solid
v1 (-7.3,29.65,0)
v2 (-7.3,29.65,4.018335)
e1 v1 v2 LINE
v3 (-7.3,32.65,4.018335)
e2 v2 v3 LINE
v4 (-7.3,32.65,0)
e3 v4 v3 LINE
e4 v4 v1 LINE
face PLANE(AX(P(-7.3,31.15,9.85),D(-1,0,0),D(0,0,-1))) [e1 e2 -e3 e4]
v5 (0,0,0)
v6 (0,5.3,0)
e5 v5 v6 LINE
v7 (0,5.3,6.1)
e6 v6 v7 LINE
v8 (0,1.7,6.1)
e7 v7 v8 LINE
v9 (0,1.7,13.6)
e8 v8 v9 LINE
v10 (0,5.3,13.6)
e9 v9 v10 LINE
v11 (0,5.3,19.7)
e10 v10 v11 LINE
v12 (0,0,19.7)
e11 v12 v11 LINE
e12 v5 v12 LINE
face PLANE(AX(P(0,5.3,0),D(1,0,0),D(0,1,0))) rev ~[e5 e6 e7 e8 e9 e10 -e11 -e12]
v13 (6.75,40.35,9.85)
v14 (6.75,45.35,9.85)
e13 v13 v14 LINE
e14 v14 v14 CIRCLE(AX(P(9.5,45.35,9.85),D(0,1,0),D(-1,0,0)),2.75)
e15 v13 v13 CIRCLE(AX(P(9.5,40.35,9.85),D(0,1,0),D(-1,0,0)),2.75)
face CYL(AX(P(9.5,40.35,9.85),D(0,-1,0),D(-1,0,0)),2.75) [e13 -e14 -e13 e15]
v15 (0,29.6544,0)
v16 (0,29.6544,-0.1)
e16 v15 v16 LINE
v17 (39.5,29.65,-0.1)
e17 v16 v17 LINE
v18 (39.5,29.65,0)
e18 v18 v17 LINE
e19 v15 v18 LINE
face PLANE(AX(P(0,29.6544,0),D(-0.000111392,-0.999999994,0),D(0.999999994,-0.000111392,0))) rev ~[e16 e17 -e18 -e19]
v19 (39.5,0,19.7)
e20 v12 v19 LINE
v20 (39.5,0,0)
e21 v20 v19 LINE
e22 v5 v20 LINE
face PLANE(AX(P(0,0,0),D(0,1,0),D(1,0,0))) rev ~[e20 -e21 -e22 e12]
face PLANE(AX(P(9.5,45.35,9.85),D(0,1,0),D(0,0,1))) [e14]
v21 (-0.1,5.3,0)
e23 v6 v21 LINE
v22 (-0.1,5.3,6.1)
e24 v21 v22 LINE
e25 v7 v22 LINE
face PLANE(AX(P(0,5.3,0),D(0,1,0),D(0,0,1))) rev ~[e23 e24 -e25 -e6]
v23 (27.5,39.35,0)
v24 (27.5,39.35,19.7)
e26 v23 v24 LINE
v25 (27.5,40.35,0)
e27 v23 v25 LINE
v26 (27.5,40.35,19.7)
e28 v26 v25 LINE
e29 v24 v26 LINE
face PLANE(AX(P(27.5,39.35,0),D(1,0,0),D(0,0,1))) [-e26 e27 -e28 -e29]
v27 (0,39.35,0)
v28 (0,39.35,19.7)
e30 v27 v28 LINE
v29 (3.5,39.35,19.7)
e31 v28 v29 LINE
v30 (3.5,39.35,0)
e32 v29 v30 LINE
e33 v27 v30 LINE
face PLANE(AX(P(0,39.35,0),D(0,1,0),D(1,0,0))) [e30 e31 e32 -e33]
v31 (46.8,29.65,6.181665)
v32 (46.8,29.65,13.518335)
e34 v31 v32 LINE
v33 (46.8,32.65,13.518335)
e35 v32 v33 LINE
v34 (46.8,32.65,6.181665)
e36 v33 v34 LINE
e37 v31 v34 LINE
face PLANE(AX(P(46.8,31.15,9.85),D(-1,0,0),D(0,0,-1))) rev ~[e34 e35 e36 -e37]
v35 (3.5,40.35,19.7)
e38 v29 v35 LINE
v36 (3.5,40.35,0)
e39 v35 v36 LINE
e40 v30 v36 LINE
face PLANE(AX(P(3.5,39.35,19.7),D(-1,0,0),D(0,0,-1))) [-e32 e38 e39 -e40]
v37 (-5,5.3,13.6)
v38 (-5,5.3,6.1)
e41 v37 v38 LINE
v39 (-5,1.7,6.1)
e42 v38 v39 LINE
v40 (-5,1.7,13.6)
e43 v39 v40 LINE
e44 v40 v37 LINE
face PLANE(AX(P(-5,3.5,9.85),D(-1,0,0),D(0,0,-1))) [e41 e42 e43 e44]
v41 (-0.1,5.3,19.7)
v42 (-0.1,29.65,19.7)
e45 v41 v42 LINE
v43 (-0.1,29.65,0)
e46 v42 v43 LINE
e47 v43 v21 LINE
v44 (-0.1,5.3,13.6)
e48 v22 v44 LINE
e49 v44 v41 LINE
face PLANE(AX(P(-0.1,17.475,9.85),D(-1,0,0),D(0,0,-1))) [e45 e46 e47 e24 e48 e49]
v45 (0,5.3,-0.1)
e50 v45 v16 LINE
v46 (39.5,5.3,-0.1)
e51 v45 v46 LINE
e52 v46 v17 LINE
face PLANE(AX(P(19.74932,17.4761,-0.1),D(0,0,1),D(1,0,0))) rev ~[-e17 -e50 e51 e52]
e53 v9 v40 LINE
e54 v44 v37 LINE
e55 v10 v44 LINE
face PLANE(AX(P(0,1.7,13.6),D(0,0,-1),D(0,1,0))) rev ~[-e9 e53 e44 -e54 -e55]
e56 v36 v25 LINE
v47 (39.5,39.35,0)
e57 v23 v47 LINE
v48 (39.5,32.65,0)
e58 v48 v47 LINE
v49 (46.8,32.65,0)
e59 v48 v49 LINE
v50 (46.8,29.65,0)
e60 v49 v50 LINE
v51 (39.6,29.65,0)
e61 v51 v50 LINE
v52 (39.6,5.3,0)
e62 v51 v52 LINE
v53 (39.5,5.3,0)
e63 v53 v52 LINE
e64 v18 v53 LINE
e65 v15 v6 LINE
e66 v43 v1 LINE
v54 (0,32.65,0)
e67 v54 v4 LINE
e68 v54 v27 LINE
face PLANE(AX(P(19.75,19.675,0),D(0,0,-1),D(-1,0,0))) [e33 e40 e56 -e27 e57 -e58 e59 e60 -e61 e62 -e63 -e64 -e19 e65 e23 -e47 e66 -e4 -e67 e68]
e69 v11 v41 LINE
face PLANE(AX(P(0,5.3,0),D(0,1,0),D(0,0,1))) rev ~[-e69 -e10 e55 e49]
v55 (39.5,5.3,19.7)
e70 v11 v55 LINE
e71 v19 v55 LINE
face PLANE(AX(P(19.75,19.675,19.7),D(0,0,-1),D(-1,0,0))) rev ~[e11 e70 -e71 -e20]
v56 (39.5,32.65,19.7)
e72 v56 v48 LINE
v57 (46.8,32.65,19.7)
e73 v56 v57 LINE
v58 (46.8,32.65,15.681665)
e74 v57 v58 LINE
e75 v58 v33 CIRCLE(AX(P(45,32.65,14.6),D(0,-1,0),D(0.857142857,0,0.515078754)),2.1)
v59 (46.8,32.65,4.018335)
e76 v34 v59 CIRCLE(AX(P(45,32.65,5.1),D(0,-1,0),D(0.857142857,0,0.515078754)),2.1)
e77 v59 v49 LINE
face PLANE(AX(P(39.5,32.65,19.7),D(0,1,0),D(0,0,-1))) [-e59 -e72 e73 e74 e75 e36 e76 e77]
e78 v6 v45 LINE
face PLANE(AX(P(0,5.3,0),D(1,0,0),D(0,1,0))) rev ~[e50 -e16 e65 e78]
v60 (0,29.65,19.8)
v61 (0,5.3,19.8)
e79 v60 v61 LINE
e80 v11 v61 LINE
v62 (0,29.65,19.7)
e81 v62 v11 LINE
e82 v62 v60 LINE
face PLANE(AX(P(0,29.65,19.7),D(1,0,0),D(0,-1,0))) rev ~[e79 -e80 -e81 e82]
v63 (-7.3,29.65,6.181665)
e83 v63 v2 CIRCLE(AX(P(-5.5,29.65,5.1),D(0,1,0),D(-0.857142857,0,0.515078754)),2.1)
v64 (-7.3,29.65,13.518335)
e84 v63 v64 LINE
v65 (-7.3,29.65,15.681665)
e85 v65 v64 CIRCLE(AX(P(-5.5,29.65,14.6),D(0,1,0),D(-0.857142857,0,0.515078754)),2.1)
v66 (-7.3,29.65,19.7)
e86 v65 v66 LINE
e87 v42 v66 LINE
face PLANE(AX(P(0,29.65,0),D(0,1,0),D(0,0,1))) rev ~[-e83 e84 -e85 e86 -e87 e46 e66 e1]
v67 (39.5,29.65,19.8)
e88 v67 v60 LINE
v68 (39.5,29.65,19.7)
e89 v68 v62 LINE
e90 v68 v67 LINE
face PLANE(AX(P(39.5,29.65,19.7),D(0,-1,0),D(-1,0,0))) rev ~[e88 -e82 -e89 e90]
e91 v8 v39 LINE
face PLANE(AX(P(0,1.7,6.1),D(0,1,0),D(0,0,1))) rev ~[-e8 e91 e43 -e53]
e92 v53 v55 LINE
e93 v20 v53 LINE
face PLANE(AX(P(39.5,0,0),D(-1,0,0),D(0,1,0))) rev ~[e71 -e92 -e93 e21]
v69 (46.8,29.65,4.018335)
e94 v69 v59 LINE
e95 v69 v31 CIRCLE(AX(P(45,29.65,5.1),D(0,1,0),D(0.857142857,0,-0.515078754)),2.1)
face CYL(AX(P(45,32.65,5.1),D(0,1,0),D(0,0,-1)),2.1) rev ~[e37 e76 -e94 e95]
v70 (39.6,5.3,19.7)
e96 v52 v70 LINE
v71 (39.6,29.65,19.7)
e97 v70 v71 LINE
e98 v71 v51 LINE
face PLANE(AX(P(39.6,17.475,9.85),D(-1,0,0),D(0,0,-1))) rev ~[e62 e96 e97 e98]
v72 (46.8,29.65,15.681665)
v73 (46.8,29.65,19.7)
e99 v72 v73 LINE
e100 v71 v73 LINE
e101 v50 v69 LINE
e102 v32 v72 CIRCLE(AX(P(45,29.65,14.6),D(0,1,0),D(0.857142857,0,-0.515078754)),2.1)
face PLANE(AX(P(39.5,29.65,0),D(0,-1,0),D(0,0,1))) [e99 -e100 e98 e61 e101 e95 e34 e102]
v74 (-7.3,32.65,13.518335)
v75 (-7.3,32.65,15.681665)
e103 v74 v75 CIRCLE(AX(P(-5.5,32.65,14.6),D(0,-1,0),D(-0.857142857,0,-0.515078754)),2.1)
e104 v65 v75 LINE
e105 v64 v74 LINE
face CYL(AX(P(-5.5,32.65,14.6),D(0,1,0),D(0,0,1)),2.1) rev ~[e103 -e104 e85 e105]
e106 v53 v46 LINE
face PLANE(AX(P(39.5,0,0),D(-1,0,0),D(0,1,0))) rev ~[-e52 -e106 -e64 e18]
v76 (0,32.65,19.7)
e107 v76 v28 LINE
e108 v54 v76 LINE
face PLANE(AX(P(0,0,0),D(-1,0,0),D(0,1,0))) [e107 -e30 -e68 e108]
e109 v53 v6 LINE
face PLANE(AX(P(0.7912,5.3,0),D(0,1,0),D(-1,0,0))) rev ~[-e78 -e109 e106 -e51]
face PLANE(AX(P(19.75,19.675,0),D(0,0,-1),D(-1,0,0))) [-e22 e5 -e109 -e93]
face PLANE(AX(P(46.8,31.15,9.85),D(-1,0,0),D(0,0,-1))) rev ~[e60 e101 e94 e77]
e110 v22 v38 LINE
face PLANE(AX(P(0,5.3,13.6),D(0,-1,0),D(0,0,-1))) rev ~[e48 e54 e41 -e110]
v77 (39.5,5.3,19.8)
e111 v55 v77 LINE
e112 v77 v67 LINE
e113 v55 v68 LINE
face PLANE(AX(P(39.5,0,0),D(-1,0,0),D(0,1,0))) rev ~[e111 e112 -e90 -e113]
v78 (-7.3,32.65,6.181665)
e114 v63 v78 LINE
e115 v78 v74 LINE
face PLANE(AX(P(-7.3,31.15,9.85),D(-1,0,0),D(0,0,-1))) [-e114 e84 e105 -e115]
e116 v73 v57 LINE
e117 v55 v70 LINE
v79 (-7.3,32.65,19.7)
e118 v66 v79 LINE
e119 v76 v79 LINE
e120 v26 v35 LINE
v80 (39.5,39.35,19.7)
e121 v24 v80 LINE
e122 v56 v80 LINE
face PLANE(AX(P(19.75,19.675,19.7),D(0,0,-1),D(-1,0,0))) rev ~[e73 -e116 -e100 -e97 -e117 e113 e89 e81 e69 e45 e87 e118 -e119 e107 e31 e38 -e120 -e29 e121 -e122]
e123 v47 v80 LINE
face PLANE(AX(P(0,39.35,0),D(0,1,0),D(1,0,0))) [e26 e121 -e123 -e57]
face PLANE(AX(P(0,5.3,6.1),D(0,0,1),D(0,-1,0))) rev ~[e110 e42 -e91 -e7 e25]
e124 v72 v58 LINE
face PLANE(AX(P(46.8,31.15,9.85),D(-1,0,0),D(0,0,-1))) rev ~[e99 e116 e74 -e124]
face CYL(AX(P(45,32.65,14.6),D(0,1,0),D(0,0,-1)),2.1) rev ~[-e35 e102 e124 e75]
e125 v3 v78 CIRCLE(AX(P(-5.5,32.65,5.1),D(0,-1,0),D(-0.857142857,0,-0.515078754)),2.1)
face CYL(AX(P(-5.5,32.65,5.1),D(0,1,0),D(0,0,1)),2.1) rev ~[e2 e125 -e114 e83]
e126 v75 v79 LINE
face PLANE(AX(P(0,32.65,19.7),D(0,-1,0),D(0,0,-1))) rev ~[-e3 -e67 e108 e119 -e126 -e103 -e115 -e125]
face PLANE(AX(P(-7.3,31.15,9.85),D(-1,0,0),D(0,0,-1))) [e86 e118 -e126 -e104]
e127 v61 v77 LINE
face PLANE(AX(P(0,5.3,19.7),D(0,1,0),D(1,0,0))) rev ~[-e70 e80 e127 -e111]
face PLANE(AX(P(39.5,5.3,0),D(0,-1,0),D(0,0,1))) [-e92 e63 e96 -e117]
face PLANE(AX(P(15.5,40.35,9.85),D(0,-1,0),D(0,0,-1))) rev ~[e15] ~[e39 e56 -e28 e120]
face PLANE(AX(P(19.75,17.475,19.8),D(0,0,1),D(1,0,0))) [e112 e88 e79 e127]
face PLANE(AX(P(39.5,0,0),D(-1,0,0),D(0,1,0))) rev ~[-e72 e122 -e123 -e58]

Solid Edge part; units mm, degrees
sketch "Sketch1" plane through (0, 0, 0) normal (0, 0, 1) x (1, 0, 0)
  line L0 (0, 39.35) -> (39.5, 39.35)
  line L1 (39.5, 0) -> (39.5, 39.35)
  line L2 (0, 0) -> (39.5, 0)
  line L3 (0, 0) -> (0, 39.35)
extrude "Protrusion1" add sketch "Sketch1" along normal blind 19.7
sketch "Sketch2" plane through (0, 19.675, 9.85) normal (-1, 0, 0) x (0, 0, 1)
  line L0 (0, 12.975) -> (-9.85, 12.975)
  line L1 (-9.85, 12.975) -> (-9.85, 9.975)
  line L2 (-9.85, 9.975) -> (9.85, 9.975)
  line L3 (9.85, 9.975) -> (9.85, 12.975)
  line L4 (9.85, 12.975) -> (0, 12.975)
extrude "ExtrudedProtrusion_2" add sketch "Sketch2" along normal blind 7.3
sketch "Sketch3" plane through (39.5, 19.675, 9.85) normal (1, 0, 0) x (0, 0, -1)
  line L0 (-9.85, 12.975) -> (9.85, 12.975)
  line L1 (9.85, 12.975) -> (9.85, 9.975)
  line L2 (9.85, 9.975) -> (-9.85, 9.975)
  line L3 (-9.85, 9.975) -> (-9.85, 12.975)
extrude "ExtrudedProtrusion_3" add sketch "Sketch3" along normal blind 7.3
sketch "Sketch4" plane through (19.75, 39.35, 9.85) normal (0, 1, 0) x (-1, 0, 0)
  line L0 (-7.75, 0) -> (-7.75, 9.85)
  line L1 (-7.75, 9.85) -> (16.25, 9.85)
  line L2 (16.25, 9.85) -> (16.25, -9.85)
  line L3 (16.25, -9.85) -> (-7.75, -9.85)
  line L4 (-7.75, -9.85) -> (-7.75, 0)
  dimension "D1" = 24
extrude "ExtrudedProtrusion_4" add sketch "Sketch4" along normal blind 1
sketch "Sketch5" plane through (15.5, 40.35, 9.85) normal (0, 1, 0) x (-1, 0, 0)
  circle A0 centre (6, 0) radius 2.75
  dimension "D1" = 5.5
extrude "ExtrudedProtrusion_5" add sketch "Sketch5" along normal blind 5
sketch "Sketch6" plane through (0, 14.825, 9.85) normal (-1, 0, 0) x (0, 0, 1)
  line L0 (-3.75, -13.125) -> (3.75, -13.125)
  line L1 (3.75, -13.125) -> (3.75, -9.525)
  line L2 (3.75, -9.525) -> (-3.75, -9.525)
  line L3 (-3.75, -9.525) -> (-3.75, -13.125)
  dimension "D1" = 7.5
  dimension "D2" = 3.6
extrude "ExtrudedProtrusion_6" add sketch "Sketch6" along normal blind 5
sketch "Sketch7" plane through (-3.65, 32.65, 9.85) normal (0, 1, 0) x (0, 0, 1)
  circle A0 centre (-4.75, -1.85) radius 2.1
  circle A1 centre (4.75, -1.85) radius 2.1
extrude "ExtrudedCutout_1" cut sketch "Sketch7" against normal blind 3.8617
sketch "Sketch8" plane through (43.15, 32.65, 9.85) normal (0, 1, 0) x (0, 0, -1)
  circle A0 centre (-4.75, -1.85) radius 2.1
  circle A1 centre (4.75, -1.85) radius 2.1
extrude "Cutout1" cut sketch "Sketch8" against normal up to vertex (3 mm away)
sketch "Sketch9" plane through (19.75, 20.175, 0) normal (0, 0, -1) x (-1, 0, 0)
  line L0 (18.9588, -14.875) -> (-19.75, -14.875)
  line L1 (-19.75, -14.875) -> (-19.75, 9.475)
  line L2 (19.75, 9.4794) -> (-19.75, 9.475)
  line L3 (19.75, -14.875) -> (19.75, 9.4794)
extrude "ExtrudedProtrusion_7" add sketch "Sketch9" along normal blind 0.1 material side at (20.1456, 5.25, 0)
sketch "Sketch10" plane through (0, 14.8272, 9.8) normal (-1, 0, 0) x (0, 0, 1)
  line L0 (-9.8, -9.5272) -> (9.9, -9.5272)
  line L1 (9.9, -9.5272) -> (9.9, 14.8228)
  line L2 (9.9, 14.8228) -> (-9.8, 14.8228)
  line L3 (-9.8, 14.8228) -> (-9.8, -9.5272)
extrude "ExtrudedProtrusion_8" add sketch "Sketch10" along normal blind 0.1
sketch "Sketch11" plane through (19.75, 20.175, 19.7) normal (0, 0, 1) x (1, 0, 0)
  line L0 (-19.75, 9.475) -> (-19.75, -14.875)
  line L1 (-19.75, -14.875) -> (19.75, -14.875)
  line L2 (19.75, -14.875) -> (19.75, 9.475)
  line L3 (19.75, 9.475) -> (-19.75, 9.475)
extrude "ExtrudedProtrusion_9" add sketch "Sketch11" along normal blind 0.1
sketch "Sketch12" plane through (39.5, 14.825, 9.85) normal (1, 0, 0) x (0, 0, -1)
  line L0 (-9.85, 14.825) -> (9.85, 14.825)
  line L1 (9.85, 14.825) -> (9.85, -9.525)
  line L2 (9.85, -9.525) -> (-9.85, -9.525)
  line L3 (-9.85, -9.525) -> (-9.85, 14.825)
extrude "ExtrudedProtrusion_10" add sketch "Sketch12" along normal blind 0.1
properties material "Aluminum Alloy:3.0255 , Al 99.5 , EN-AW 1050A"
